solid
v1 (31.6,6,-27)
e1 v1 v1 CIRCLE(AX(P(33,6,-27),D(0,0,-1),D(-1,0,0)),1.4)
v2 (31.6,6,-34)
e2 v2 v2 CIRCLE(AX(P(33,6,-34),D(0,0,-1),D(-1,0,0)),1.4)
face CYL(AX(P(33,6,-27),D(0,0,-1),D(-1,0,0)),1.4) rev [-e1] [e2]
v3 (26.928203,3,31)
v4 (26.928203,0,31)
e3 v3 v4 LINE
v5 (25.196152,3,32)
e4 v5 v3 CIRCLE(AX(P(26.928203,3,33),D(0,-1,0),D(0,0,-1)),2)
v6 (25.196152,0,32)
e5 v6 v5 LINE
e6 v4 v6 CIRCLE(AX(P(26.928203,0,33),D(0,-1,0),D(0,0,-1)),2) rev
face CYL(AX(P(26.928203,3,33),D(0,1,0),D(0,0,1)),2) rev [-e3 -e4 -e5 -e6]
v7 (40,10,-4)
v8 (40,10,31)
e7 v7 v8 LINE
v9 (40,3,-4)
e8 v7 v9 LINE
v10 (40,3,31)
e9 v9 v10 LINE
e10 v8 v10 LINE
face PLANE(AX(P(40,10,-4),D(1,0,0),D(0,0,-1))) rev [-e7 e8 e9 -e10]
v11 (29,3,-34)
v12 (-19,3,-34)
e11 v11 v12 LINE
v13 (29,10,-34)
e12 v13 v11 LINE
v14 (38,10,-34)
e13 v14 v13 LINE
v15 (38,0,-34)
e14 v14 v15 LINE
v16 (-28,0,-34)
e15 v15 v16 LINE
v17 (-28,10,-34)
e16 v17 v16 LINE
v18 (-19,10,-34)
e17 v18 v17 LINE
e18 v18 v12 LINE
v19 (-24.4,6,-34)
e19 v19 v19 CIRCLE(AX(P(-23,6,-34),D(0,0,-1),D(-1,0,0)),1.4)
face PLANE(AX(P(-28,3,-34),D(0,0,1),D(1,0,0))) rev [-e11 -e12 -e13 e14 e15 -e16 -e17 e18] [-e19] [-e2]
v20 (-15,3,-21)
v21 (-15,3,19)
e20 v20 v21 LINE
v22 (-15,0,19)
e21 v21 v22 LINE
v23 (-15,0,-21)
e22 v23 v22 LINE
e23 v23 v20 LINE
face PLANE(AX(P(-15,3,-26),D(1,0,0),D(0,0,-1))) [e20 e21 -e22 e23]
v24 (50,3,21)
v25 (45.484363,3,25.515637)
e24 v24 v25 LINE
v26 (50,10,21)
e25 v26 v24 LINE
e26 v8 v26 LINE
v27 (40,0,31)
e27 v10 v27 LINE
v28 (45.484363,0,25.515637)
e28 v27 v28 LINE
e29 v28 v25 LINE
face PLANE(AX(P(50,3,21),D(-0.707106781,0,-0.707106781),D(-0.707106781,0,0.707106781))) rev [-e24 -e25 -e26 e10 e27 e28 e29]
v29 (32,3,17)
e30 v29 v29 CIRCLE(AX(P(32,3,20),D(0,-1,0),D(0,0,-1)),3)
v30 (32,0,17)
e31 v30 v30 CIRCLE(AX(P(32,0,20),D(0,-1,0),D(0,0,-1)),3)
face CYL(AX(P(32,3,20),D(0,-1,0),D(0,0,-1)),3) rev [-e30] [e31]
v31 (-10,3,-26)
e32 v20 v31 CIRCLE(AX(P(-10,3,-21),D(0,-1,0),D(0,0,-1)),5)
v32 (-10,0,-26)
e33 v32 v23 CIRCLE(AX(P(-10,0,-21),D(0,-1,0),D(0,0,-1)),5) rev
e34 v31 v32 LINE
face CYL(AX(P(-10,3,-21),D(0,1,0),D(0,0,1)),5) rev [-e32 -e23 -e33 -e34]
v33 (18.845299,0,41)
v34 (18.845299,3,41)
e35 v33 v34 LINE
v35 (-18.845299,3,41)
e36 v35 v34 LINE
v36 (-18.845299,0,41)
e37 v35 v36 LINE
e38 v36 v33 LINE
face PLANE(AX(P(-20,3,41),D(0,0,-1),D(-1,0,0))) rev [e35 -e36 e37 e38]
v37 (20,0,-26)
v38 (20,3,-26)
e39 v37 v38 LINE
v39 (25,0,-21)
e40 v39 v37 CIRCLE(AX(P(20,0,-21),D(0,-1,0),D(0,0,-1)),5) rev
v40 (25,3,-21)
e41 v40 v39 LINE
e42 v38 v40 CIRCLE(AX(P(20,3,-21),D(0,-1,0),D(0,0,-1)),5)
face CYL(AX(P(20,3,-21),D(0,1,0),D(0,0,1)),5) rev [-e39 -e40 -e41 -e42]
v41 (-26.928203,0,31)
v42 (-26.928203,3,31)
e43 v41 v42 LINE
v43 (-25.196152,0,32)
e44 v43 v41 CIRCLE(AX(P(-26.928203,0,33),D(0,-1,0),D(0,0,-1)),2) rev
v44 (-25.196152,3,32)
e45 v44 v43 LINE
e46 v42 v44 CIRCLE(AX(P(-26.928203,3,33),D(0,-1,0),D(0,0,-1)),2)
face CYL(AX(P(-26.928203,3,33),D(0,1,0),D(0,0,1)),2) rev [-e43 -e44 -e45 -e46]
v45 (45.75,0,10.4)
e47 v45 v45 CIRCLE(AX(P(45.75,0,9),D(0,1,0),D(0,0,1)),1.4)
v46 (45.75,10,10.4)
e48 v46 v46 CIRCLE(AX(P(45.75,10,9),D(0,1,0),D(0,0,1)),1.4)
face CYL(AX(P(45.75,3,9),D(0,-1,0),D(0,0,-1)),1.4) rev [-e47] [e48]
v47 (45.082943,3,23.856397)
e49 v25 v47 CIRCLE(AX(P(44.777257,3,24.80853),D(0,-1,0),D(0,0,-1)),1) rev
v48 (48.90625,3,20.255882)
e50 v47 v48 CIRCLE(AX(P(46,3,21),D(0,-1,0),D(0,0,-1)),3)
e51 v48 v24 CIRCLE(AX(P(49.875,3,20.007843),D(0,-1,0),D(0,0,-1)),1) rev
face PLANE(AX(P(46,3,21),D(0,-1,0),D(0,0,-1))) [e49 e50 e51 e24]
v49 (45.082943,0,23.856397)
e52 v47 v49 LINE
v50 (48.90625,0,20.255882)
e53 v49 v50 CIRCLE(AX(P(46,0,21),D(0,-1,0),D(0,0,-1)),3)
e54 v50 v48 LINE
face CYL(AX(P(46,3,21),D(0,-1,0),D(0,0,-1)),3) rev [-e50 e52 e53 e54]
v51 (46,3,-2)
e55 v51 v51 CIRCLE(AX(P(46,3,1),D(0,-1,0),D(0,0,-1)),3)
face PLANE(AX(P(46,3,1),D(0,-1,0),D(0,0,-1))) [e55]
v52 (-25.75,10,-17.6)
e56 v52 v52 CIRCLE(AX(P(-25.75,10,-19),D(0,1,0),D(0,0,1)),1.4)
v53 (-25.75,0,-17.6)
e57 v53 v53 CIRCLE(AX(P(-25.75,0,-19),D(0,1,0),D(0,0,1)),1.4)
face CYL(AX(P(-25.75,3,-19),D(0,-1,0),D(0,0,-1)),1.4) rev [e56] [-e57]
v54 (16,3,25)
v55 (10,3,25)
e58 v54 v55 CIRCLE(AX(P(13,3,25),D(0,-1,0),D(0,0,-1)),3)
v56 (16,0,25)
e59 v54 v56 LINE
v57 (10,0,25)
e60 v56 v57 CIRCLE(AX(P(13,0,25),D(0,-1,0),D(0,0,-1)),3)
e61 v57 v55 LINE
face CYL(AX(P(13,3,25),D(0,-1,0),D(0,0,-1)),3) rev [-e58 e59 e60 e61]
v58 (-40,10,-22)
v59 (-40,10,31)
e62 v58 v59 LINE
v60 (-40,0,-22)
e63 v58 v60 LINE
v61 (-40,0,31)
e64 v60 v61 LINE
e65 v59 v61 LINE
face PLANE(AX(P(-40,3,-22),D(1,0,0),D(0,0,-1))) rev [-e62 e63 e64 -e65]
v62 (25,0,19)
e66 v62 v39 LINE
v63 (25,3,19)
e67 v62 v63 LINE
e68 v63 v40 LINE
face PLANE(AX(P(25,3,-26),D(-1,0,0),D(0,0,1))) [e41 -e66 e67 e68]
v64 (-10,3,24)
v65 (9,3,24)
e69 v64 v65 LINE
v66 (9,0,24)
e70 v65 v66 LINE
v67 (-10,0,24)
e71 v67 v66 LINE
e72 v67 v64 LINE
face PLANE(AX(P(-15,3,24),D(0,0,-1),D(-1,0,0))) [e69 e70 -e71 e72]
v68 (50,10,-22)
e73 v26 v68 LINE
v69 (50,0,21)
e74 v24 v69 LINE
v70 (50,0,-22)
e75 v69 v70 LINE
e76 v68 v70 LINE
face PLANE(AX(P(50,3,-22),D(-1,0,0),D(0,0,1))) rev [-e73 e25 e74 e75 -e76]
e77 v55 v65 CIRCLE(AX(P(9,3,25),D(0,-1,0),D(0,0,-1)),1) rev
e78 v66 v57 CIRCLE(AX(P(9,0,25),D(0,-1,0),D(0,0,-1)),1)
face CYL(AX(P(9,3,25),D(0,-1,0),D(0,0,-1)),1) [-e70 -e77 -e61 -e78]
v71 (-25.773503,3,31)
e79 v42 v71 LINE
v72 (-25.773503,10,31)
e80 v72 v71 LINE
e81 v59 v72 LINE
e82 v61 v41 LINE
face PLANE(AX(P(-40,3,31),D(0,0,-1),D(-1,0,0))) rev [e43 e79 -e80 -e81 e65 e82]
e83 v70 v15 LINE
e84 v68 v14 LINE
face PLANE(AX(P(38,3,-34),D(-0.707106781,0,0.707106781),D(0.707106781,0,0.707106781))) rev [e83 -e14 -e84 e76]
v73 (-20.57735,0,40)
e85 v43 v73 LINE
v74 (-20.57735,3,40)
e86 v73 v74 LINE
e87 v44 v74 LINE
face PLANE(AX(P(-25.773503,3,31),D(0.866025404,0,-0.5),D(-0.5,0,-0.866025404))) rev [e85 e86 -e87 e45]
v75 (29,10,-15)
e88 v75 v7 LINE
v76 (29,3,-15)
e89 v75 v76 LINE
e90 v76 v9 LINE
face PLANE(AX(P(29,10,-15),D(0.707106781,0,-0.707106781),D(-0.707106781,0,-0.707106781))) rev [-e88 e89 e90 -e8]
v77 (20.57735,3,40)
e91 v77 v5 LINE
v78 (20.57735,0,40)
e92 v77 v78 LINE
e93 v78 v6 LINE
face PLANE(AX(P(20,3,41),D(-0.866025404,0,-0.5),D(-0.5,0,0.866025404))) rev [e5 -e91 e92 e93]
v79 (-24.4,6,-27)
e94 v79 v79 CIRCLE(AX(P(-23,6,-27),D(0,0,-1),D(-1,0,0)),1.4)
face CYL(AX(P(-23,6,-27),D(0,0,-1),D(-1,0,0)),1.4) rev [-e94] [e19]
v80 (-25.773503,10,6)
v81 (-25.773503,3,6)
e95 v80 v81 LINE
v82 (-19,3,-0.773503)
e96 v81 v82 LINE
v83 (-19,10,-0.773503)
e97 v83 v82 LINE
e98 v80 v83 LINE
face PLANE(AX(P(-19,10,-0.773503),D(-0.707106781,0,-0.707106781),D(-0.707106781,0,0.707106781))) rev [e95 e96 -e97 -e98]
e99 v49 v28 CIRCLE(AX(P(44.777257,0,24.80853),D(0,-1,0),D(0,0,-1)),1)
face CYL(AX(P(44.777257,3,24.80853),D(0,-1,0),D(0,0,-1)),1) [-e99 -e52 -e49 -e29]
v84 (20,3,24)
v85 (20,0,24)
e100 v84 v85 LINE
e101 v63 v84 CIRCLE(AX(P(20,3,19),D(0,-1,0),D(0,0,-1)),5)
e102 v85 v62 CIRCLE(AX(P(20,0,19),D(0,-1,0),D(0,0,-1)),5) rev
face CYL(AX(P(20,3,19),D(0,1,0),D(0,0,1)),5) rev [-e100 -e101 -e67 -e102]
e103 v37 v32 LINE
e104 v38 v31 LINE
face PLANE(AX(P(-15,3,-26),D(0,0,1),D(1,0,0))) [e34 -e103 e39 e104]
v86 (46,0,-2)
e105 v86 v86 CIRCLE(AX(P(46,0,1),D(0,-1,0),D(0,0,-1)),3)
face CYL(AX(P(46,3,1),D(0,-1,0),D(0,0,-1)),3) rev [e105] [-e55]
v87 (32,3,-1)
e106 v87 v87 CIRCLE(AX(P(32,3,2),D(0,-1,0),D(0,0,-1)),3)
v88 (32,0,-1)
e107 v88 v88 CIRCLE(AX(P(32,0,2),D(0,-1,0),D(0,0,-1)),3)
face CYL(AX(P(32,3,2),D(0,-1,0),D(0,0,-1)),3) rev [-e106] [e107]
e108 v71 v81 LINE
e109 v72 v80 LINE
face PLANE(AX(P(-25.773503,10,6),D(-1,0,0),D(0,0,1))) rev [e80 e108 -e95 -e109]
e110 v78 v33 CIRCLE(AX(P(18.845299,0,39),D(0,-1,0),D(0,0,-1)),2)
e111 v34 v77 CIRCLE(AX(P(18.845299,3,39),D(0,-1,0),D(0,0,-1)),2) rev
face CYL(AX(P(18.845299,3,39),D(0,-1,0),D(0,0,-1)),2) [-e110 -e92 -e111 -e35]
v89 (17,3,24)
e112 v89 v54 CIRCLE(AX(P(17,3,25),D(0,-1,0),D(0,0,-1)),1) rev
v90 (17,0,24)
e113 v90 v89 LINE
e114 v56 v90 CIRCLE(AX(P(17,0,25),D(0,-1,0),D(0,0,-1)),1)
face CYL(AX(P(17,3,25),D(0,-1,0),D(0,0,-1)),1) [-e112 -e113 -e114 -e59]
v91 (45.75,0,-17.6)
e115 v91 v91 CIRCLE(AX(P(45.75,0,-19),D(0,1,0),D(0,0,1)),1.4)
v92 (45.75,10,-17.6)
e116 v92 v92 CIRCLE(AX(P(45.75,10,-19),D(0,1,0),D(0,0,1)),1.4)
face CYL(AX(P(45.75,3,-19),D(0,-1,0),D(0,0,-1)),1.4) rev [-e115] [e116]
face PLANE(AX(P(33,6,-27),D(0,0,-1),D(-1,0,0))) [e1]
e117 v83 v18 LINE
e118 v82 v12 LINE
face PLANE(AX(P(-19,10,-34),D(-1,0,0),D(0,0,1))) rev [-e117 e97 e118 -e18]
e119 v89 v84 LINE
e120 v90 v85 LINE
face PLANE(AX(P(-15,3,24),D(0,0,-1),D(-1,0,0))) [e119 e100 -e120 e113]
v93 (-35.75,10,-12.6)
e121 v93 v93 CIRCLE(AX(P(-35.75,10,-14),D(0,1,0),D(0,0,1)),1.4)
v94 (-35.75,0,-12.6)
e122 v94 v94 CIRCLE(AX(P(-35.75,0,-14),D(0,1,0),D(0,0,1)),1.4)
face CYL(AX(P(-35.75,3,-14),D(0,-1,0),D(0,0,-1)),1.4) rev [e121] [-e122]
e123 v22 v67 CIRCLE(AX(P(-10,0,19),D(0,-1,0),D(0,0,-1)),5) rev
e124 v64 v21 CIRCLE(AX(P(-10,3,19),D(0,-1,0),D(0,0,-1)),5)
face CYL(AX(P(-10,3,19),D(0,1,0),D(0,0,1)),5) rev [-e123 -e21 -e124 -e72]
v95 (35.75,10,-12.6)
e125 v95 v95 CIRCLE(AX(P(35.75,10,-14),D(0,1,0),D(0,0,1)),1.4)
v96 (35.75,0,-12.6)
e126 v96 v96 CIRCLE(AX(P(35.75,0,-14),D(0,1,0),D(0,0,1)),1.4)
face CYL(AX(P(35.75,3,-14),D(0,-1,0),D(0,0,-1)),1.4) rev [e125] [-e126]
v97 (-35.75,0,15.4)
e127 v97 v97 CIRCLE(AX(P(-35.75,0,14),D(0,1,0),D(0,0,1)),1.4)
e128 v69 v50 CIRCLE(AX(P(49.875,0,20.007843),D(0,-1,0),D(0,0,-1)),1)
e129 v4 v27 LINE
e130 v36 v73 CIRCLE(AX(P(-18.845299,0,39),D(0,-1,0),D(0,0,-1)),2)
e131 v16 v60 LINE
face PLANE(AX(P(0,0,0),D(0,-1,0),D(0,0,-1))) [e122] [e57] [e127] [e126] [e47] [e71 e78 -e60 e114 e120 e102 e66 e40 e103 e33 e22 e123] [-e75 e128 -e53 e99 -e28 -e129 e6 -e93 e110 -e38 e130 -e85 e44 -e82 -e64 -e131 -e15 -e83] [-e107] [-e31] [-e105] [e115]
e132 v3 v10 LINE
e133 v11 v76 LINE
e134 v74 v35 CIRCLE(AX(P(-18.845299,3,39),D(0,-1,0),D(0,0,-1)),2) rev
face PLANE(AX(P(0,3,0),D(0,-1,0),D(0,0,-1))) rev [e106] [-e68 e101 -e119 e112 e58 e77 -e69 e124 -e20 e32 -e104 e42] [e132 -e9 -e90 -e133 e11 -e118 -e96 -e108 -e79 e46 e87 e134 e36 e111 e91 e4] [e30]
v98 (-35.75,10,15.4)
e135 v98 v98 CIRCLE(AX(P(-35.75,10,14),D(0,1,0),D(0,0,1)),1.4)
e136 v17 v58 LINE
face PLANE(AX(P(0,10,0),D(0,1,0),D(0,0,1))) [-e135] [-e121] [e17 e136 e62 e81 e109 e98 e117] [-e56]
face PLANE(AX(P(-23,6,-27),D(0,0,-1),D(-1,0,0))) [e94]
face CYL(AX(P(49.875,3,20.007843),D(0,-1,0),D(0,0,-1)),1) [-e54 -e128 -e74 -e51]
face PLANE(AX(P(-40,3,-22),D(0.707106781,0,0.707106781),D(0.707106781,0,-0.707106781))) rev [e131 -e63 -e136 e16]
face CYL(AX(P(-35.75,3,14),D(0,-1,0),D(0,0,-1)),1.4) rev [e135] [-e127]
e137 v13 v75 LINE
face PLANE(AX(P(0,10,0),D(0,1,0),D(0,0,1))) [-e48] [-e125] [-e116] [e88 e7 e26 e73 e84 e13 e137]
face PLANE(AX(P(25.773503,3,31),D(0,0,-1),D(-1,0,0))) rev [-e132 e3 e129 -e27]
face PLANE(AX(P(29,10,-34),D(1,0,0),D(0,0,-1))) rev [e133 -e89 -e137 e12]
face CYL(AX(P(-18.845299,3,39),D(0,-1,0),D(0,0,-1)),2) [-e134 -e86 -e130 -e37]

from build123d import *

# Parameters (mm, degrees)
SKETCH_1_R          = 1.4
SKETCH_1_W          = 40
SKETCH_1_H          = 50
EXTRUDE_1_DEPTH     = 3
SKETCH_2_R          = 1.4
EXTRUDE_2_DEPTH     = 7
SKETCH_3_R          = 1.4
CUT_EXTRUDE_1_DEPTH = 7
SKETCH_4_R          = 3
CUT_EXTRUDE_2_DEPTH = 3
FILLET_1_R          = 1
FILLET_2_R          = 2
FILLET_3_R          = 5


with BuildPart() as part:
    # 草图1 → 凸台-拉伸1 (new body)
    with BuildSketch(Plane(origin=(0, 0, 0), x_dir=(1, 0, 0), z_dir=(0, 1, 0))):
        Polygon((-40, 22), (-40, -31), (-25.773502692, -31), (-20, -41), (20, -41), (25.773502692, -31), (40, -31), (50, -21), (50, 22), (38, 34), (-28, 34), align=None)
        with Locations(Location((-35.75, 14, 0), (0, 0, 270))):
            Circle(SKETCH_1_R, mode=Mode.SUBTRACT)
        with Locations(Location((35.75, 14, 0), (0, 0, 270))):
            Circle(SKETCH_1_R, mode=Mode.SUBTRACT)
        with Locations(Location((-35.75, -14, 0), (0, 0, 270))):
            Circle(SKETCH_1_R, mode=Mode.SUBTRACT)
        with Locations(Location((45.75, 19, 0), (0, 0, 270))):
            Circle(SKETCH_1_R, mode=Mode.SUBTRACT)
        with Locations(Location((45.75, -9, 0), (0, 0, 270))):
            Circle(SKETCH_1_R, mode=Mode.SUBTRACT)
        with Locations(Location((-25.75, 19, 0), (0, 0, 270))):
            Circle(SKETCH_1_R, mode=Mode.SUBTRACT)
        with Locations((5, 1)):
            Rectangle(SKETCH_1_W, SKETCH_1_H, mode=Mode.SUBTRACT)
    extrude(amount=EXTRUDE_1_DEPTH)

    # 草图2 → 凸台-拉伸2 (add)
    # profile 1 of 2: a face of its own
    with BuildSketch(Plane(origin=(0, 3, 0), x_dir=(1, 0, 0), z_dir=(0, 1, 0))):
        Polygon((-19, 34), (-19, 0.773502692), (-25.773502692, -6), (-25.773502692, -31), (-40, -31), (-40, 22), (-28, 34), align=None)
        with Locations(Location((-35.75, -14, 0), (0, 0, 270))):
            Circle(SKETCH_2_R, mode=Mode.SUBTRACT)
        with Locations(Location((-35.75, 14, 0), (0, 0, 270))):
            Circle(SKETCH_2_R, mode=Mode.SUBTRACT)
        with Locations(Location((-25.75, 19, 0), (0, 0, 270))):
            Circle(SKETCH_2_R, mode=Mode.SUBTRACT)
    # profile 2 of 2: a face of its own
    with BuildSketch(Plane(origin=(0, 3, 0), x_dir=(1, 0, 0), z_dir=(0, 1, 0))):
        Polygon((29, 34), (29, 15), (40, 4), (40, -31), (50, -21), (50, 22), (38, 34), align=None)
        with Locations(Location((45.75, -9, 0), (0, 0, 270))):
            Circle(SKETCH_2_R, mode=Mode.SUBTRACT)
        with Locations(Location((45.75, 19, 0), (0, 0, 270))):
            Circle(SKETCH_2_R, mode=Mode.SUBTRACT)
        with Locations(Location((35.75, 14, 0), (0, 0, 270))):
            Circle(SKETCH_2_R, mode=Mode.SUBTRACT)
    extrude(amount=EXTRUDE_2_DEPTH)

    # 草图3 → 切除-拉伸1 (cut)
    with BuildSketch(Plane(origin=(0, 0, -34), x_dir=(-1, 0, 0), z_dir=(0, 0, -1))):
        with Locations((-33, 6)):
            Circle(SKETCH_3_R)
        with Locations((23, 6)):
            Circle(SKETCH_3_R)
    extrude(amount=-CUT_EXTRUDE_1_DEPTH, mode=Mode.SUBTRACT)

    # 草图4 → 切除-拉伸2 (cut)
    with BuildSketch(Plane.XZ):
        with Locations((46, 21)):
            Circle(SKETCH_4_R)
        with Locations(Location((46, 1, 0), (0, 0, 270))):
            Circle(SKETCH_4_R)
        with Locations(Location((32, 20, 0), (0, 0, 270))):
            Circle(SKETCH_4_R)
        with Locations(Location((32, 2, 0), (0, 0, 270))):
            Circle(SKETCH_4_R)
        with Locations((13, 25)):
            Circle(SKETCH_4_R)
    extrude(amount=-CUT_EXTRUDE_2_DEPTH, mode=Mode.SUBTRACT)

    # 圆角1
    # the kernel refuses this fillet: 1 mm, written as the material it takes off along each edge
    with BuildSketch(Plane(origin=(47.292893219, 3, 23.707106781), x_dir=(-0.9977260233446211, 0, 0.0674001657336884), z_dir=(0, -1, 0))) as fillet_1_piece_1:
        with BuildLine():
            CenterArc((2.584152116, -0.929364034), FILLET_1_R, 111.664104493, 117.20057038)
            Line((1.926312394, -1.682521985), (1.913155599, -1.697585144))
            Line((1.913155599, -1.697585144), (-0.013156794, -0.015063159))
            Line((-0.013156794, -0.015063159), (0.007383292, 0.018587281))
            ThreePointArc((0.007383292, 0.018587281), (1.107493764, -0.191907899), (2.207604236, 0.018587281))
            Line((2.207604236, 0.018587281), (2.214987528, 0))
        make_face()
    extrude(amount=9.394118228, mode=Mode.SUBTRACT)
    with BuildSketch(Plane(origin=(48.707106781, 3, 22.292893219), x_dir=(0.09729861673044447, 0, -0.9952552331851072), z_dir=(0, -1, 0))) as fillet_1_piece_2:
        with BuildLine():
            CenterArc((2.387842326, 0.940019638), FILLET_1_R, 167.235610317, 82.819244219)
            Line((1.412555464, 1.16096202), (1.393049727, 1.165380868))
            ThreePointArc((1.393049727, 1.165380868), (0.693578708, 0.595932055), (-0.012699024, 0.015451045))
            Line((-0.012699024, 0.015451045), (0.006822407, -0.018800393))
            ThreePointArc((0.006822407, -0.018800393), (1.023360997, 0.159941087), (2.039899587, -0.018800393))
            Line((2.039899587, -0.018800393), (2.046721994, 0))
        make_face()
    extrude(amount=8.116804984, mode=Mode.SUBTRACT)
    with BuildSketch(Plane(origin=(10.171572875, 5.928932188, 24), x_dir=(-1, 0, 0), z_dir=(0, -1, 0))) as fillet_1_piece_3:
        with BuildLine():
            CenterArc((1.171572875, -1), FILLET_1_R, 90, 90)
            Line((0.171572875, -1), (0.151572875, -1))
            ThreePointArc((0.151572875, -1), (0.108656583, -0.496076103), (-0.018856181, -0.006666667))
            Line((-0.018856181, -0.006666667), (0, 0.02))
            Line((0, 0.02), (1.171572875, 0.02))
            Line((1.171572875, 0.02), (1.171572875, 0))
        make_face()
    extrude(amount=8.857864376, mode=Mode.SUBTRACT)
    with BuildSketch(Plane(origin=(15.828427125, 5.928932188, 24), x_dir=(0.1691019787257596, 0, 0.9855985596534894), z_dir=(0, -1, 0))) as fillet_1_piece_4:
        with BuildLine():
            CenterArc((1.183713851, -0.98559856), FILLET_1_R, 99.735610317, 90)
            Line((0.198115291, -1.154700538), (0.17840332, -1.158082578))
            Line((0.17840332, -1.158082578), (-0.019711971, -0.00338204))
            Line((-0.019711971, -0.00338204), (0.00338204, 0.019711971))
            ThreePointArc((0.00338204, 0.019711971), (0.507305936, -0.023204321), (1.011229833, 0.019711971))
            Line((1.011229833, 0.019711971), (1.014611872, 0))
        make_face()
    extrude(amount=8.857864376, mode=Mode.SUBTRACT)

    # 圆角2
    fillet_2_edges = [part.edges().sort_by_distance(p)[0] for p in [
        (25.773502692, 1.5, 31),
        (20, 1.5, 41),
        (-20, 1.5, 41),
        (-25.773502692, 1.5, 31),
    ]]
    fillet(fillet_2_edges, radius=FILLET_2_R)

    # 圆角3
    fillet_3_edges = [part.edges().sort_by_distance(p)[0] for p in [
        (-15, 1.5, -26),
        (-15, 1.5, 24),
        (25, 1.5, 24),
        (25, 1.5, -26),
    ]]
    fillet(fillet_3_edges, radius=FILLET_3_R)


solid = part.part
